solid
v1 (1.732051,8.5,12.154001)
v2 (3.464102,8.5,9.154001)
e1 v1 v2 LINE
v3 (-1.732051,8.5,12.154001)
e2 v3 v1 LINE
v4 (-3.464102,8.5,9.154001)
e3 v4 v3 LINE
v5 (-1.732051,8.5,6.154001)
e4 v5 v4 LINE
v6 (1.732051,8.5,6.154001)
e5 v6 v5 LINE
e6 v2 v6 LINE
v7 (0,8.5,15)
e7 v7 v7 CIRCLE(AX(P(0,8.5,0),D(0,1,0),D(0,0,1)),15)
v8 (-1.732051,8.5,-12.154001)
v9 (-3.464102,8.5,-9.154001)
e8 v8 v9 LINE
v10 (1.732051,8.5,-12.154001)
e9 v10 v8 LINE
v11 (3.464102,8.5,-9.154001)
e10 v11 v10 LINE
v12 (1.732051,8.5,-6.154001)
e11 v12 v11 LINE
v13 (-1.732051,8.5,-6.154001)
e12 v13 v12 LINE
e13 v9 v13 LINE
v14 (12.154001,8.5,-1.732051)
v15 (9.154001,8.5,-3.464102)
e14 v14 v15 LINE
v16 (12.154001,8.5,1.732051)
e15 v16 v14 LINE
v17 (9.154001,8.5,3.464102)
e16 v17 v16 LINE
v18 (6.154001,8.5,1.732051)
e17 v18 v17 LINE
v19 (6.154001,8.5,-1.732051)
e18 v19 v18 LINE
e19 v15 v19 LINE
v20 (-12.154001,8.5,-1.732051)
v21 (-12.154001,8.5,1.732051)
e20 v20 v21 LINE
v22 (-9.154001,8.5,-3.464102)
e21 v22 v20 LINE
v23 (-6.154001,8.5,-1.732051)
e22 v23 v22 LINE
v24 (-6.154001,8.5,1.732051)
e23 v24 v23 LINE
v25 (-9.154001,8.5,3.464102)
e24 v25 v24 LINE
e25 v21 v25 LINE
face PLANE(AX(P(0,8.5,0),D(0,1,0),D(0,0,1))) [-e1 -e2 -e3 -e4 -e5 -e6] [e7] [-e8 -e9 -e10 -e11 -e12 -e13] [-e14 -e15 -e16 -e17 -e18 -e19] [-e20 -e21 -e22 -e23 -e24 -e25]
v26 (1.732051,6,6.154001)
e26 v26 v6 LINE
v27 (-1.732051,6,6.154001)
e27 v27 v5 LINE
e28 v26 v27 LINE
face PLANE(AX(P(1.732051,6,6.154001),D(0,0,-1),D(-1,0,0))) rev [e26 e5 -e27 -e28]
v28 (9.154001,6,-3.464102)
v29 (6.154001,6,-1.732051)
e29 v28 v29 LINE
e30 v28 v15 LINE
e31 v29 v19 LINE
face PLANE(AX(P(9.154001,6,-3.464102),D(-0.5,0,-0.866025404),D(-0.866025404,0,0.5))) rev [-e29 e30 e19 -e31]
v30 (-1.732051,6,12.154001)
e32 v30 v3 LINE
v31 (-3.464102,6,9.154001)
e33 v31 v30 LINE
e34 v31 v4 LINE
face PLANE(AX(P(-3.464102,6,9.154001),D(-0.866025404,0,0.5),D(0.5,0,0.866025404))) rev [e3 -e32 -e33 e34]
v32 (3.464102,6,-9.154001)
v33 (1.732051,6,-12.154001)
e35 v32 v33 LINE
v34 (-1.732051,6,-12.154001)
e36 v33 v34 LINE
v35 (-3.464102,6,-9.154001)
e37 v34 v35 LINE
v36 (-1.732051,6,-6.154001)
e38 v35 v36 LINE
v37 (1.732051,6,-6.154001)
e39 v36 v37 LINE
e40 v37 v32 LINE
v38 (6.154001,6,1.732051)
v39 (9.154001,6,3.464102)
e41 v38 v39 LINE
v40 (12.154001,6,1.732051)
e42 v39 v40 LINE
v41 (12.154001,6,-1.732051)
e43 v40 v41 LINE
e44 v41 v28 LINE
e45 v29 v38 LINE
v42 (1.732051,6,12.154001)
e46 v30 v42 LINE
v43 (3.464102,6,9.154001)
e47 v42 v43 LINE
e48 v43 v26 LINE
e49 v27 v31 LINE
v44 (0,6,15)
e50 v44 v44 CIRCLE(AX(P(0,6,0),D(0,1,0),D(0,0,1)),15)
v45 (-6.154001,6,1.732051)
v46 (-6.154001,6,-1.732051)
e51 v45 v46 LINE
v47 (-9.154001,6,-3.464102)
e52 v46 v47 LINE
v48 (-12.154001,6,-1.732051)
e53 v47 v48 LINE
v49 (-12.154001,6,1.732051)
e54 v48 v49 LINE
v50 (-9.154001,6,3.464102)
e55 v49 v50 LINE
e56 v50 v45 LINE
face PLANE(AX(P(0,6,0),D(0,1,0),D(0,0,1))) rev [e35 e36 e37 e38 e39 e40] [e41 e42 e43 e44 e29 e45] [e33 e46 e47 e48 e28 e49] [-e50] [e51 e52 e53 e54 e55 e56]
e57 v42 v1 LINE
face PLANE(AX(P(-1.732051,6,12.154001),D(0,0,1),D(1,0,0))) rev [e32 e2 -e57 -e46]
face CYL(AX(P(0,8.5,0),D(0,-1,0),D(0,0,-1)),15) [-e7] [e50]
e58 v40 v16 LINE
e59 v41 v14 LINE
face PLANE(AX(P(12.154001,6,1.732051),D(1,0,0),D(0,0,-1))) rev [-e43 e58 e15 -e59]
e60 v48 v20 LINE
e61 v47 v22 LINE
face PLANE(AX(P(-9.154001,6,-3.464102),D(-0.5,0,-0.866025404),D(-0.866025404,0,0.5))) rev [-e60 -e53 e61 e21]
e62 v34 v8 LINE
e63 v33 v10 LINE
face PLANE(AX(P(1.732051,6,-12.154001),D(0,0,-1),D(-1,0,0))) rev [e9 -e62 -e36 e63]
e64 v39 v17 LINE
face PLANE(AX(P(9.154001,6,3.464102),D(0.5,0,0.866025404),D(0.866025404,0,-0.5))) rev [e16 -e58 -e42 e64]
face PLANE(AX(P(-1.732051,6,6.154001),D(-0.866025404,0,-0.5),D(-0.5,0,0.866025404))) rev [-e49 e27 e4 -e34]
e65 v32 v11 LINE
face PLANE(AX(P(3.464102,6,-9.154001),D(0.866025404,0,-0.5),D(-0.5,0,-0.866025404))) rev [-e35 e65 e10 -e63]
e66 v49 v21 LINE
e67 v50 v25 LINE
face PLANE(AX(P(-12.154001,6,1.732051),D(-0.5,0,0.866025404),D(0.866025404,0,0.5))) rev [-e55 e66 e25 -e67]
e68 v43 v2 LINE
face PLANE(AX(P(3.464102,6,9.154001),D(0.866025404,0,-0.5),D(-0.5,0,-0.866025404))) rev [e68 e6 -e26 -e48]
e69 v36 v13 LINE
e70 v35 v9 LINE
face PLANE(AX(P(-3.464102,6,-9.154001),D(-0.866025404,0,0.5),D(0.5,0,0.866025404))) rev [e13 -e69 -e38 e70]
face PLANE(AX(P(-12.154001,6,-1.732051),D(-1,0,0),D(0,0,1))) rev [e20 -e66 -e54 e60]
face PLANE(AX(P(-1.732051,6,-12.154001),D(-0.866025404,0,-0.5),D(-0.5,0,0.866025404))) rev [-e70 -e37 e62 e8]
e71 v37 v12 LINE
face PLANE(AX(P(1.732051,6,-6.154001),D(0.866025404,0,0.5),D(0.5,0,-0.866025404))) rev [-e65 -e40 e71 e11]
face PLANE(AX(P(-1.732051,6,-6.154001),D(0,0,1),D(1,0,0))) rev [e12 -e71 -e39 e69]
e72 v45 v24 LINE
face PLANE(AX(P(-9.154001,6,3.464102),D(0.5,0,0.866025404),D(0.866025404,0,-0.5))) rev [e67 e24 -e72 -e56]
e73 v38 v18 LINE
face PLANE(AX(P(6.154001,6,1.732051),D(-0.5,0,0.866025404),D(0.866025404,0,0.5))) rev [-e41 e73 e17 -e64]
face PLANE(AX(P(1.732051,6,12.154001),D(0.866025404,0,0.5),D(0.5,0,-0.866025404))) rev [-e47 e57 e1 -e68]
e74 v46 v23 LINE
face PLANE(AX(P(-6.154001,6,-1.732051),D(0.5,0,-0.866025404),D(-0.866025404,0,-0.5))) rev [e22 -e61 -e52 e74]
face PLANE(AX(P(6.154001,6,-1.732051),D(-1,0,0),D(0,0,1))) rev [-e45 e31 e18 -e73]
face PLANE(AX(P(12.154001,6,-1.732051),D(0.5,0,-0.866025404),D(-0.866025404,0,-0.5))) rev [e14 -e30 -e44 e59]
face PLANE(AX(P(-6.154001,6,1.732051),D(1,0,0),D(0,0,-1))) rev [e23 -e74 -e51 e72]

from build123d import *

# Parameters (mm, degrees)
CROQUIS1_R              = 8.5
SALIENTE_EXTRUIR1_DEPTH = 2
CROQUIS2_R              = 7.5
SALIENTE_EXTRUIR2_DEPTH = 4
CROQUIS3_R              = 15
SALIENTE_EXTRUIR3_DEPTH = 2.5
REDONDEO1_R             = 3
CORTAR_EXTRUIR1_DEPTH   = 2.5
CROQUIS5_R              = 8.5
CORTAR_EXTRUIR2_DEPTH   = 10


with BuildPart() as part:
    # Croquis1 → Saliente-Extruir1 (new body)
    with BuildSketch(Plane(origin=(0, 0, 0), x_dir=(1, 0, 0), z_dir=(0, 1, 0))):
        with Locations(Location((0, 0, 0), (0, 0, 270))):
            Circle(CROQUIS1_R)
    extrude(amount=SALIENTE_EXTRUIR1_DEPTH)

    # Croquis2 → Saliente-Extruir2 (add)
    with BuildSketch(Plane(origin=(0, 2, 0), x_dir=(1, 0, 0), z_dir=(0, 1, 0))):
        with Locations(Location((0, 0, 0), (0, 0, 270))):
            Circle(CROQUIS2_R)
    extrude(amount=SALIENTE_EXTRUIR2_DEPTH)

    # Croquis3 → Saliente-Extruir3 (add)
    with BuildSketch(Plane(origin=(0, 6, 0), x_dir=(1, 0, 0), z_dir=(0, 1, 0))):
        with Locations(Location((0, 0, 0), (0, 0, 270))):
            Circle(CROQUIS3_R)
    extrude(amount=SALIENTE_EXTRUIR3_DEPTH)

    # Redondeo1
    # the kernel refuses this fillet: 3 mm, written as the material it takes off along each edge
    with BuildSketch(Plane(origin=(0, 0, 0), x_dir=(0, 0, 1), z_dir=(-1, 0, 0))) as redondeo1_piece_1:
        with BuildLine():
            CenterArc((5.671572875, 3), REDONDEO1_R, 270, 70.528779366)
            Line((5.671572875, 0), (5.671572875, -0.06))
            Line((5.671572875, -0.06), (8.5, -0.06))
            Line((8.5, -0.06), (8.56, 0))
            ThreePointArc((8.56, 0), (8.56, 1), (8.556568542, 1.98))
            Line((8.556568542, 1.98), (8.5, 2))
        make_face()
    revolve(axis=Axis((0, 0, 0), (0, 1, 0)), mode=Mode.SUBTRACT)

    # Croquis4 → Cortar-Extruir1 (cut)
    with BuildSketch(Plane(origin=(0, 8.5, 0), x_dir=(1, 0, 0), z_dir=(0, 1, 0))):
        Polygon((12.154001459, -1.732050808), (12.154001459, 1.732050808), (9.154001459, 3.464101615), (6.154001459, 1.732050808), (6.154001459, -1.732050808), (9.154001459, -3.464101615), align=None)
        Polygon((3.464101615, 9.154001459), (1.732050808, 12.154001459), (-1.732050808, 12.154001459), (-3.464101615, 9.154001459), (-1.732050808, 6.154001459), (1.732050808, 6.154001459), align=None)
        Polygon((-1.732050808, -12.154001459), (1.732050808, -12.154001459), (3.464101615, -9.154001459), (1.732050808, -6.154001459), (-1.732050808, -6.154001459), (-3.464101615, -9.154001459), align=None)
        Polygon((-12.154001459, 1.732050808), (-12.154001459, -1.732050808), (-9.154001459, -3.464101615), (-6.154001459, -1.732050808), (-6.154001459, 1.732050808), (-9.154001459, 3.464101615), align=None)
    extrude(amount=-CORTAR_EXTRUIR1_DEPTH, mode=Mode.SUBTRACT)

    # Croquis5 → Cortar-Extruir2 (cut)
    with BuildSketch(Plane.XZ.offset(-6)):
        Circle(CROQUIS5_R)
    extrude(amount=CORTAR_EXTRUIR2_DEPTH, mode=Mode.SUBTRACT)


solid = part.part
